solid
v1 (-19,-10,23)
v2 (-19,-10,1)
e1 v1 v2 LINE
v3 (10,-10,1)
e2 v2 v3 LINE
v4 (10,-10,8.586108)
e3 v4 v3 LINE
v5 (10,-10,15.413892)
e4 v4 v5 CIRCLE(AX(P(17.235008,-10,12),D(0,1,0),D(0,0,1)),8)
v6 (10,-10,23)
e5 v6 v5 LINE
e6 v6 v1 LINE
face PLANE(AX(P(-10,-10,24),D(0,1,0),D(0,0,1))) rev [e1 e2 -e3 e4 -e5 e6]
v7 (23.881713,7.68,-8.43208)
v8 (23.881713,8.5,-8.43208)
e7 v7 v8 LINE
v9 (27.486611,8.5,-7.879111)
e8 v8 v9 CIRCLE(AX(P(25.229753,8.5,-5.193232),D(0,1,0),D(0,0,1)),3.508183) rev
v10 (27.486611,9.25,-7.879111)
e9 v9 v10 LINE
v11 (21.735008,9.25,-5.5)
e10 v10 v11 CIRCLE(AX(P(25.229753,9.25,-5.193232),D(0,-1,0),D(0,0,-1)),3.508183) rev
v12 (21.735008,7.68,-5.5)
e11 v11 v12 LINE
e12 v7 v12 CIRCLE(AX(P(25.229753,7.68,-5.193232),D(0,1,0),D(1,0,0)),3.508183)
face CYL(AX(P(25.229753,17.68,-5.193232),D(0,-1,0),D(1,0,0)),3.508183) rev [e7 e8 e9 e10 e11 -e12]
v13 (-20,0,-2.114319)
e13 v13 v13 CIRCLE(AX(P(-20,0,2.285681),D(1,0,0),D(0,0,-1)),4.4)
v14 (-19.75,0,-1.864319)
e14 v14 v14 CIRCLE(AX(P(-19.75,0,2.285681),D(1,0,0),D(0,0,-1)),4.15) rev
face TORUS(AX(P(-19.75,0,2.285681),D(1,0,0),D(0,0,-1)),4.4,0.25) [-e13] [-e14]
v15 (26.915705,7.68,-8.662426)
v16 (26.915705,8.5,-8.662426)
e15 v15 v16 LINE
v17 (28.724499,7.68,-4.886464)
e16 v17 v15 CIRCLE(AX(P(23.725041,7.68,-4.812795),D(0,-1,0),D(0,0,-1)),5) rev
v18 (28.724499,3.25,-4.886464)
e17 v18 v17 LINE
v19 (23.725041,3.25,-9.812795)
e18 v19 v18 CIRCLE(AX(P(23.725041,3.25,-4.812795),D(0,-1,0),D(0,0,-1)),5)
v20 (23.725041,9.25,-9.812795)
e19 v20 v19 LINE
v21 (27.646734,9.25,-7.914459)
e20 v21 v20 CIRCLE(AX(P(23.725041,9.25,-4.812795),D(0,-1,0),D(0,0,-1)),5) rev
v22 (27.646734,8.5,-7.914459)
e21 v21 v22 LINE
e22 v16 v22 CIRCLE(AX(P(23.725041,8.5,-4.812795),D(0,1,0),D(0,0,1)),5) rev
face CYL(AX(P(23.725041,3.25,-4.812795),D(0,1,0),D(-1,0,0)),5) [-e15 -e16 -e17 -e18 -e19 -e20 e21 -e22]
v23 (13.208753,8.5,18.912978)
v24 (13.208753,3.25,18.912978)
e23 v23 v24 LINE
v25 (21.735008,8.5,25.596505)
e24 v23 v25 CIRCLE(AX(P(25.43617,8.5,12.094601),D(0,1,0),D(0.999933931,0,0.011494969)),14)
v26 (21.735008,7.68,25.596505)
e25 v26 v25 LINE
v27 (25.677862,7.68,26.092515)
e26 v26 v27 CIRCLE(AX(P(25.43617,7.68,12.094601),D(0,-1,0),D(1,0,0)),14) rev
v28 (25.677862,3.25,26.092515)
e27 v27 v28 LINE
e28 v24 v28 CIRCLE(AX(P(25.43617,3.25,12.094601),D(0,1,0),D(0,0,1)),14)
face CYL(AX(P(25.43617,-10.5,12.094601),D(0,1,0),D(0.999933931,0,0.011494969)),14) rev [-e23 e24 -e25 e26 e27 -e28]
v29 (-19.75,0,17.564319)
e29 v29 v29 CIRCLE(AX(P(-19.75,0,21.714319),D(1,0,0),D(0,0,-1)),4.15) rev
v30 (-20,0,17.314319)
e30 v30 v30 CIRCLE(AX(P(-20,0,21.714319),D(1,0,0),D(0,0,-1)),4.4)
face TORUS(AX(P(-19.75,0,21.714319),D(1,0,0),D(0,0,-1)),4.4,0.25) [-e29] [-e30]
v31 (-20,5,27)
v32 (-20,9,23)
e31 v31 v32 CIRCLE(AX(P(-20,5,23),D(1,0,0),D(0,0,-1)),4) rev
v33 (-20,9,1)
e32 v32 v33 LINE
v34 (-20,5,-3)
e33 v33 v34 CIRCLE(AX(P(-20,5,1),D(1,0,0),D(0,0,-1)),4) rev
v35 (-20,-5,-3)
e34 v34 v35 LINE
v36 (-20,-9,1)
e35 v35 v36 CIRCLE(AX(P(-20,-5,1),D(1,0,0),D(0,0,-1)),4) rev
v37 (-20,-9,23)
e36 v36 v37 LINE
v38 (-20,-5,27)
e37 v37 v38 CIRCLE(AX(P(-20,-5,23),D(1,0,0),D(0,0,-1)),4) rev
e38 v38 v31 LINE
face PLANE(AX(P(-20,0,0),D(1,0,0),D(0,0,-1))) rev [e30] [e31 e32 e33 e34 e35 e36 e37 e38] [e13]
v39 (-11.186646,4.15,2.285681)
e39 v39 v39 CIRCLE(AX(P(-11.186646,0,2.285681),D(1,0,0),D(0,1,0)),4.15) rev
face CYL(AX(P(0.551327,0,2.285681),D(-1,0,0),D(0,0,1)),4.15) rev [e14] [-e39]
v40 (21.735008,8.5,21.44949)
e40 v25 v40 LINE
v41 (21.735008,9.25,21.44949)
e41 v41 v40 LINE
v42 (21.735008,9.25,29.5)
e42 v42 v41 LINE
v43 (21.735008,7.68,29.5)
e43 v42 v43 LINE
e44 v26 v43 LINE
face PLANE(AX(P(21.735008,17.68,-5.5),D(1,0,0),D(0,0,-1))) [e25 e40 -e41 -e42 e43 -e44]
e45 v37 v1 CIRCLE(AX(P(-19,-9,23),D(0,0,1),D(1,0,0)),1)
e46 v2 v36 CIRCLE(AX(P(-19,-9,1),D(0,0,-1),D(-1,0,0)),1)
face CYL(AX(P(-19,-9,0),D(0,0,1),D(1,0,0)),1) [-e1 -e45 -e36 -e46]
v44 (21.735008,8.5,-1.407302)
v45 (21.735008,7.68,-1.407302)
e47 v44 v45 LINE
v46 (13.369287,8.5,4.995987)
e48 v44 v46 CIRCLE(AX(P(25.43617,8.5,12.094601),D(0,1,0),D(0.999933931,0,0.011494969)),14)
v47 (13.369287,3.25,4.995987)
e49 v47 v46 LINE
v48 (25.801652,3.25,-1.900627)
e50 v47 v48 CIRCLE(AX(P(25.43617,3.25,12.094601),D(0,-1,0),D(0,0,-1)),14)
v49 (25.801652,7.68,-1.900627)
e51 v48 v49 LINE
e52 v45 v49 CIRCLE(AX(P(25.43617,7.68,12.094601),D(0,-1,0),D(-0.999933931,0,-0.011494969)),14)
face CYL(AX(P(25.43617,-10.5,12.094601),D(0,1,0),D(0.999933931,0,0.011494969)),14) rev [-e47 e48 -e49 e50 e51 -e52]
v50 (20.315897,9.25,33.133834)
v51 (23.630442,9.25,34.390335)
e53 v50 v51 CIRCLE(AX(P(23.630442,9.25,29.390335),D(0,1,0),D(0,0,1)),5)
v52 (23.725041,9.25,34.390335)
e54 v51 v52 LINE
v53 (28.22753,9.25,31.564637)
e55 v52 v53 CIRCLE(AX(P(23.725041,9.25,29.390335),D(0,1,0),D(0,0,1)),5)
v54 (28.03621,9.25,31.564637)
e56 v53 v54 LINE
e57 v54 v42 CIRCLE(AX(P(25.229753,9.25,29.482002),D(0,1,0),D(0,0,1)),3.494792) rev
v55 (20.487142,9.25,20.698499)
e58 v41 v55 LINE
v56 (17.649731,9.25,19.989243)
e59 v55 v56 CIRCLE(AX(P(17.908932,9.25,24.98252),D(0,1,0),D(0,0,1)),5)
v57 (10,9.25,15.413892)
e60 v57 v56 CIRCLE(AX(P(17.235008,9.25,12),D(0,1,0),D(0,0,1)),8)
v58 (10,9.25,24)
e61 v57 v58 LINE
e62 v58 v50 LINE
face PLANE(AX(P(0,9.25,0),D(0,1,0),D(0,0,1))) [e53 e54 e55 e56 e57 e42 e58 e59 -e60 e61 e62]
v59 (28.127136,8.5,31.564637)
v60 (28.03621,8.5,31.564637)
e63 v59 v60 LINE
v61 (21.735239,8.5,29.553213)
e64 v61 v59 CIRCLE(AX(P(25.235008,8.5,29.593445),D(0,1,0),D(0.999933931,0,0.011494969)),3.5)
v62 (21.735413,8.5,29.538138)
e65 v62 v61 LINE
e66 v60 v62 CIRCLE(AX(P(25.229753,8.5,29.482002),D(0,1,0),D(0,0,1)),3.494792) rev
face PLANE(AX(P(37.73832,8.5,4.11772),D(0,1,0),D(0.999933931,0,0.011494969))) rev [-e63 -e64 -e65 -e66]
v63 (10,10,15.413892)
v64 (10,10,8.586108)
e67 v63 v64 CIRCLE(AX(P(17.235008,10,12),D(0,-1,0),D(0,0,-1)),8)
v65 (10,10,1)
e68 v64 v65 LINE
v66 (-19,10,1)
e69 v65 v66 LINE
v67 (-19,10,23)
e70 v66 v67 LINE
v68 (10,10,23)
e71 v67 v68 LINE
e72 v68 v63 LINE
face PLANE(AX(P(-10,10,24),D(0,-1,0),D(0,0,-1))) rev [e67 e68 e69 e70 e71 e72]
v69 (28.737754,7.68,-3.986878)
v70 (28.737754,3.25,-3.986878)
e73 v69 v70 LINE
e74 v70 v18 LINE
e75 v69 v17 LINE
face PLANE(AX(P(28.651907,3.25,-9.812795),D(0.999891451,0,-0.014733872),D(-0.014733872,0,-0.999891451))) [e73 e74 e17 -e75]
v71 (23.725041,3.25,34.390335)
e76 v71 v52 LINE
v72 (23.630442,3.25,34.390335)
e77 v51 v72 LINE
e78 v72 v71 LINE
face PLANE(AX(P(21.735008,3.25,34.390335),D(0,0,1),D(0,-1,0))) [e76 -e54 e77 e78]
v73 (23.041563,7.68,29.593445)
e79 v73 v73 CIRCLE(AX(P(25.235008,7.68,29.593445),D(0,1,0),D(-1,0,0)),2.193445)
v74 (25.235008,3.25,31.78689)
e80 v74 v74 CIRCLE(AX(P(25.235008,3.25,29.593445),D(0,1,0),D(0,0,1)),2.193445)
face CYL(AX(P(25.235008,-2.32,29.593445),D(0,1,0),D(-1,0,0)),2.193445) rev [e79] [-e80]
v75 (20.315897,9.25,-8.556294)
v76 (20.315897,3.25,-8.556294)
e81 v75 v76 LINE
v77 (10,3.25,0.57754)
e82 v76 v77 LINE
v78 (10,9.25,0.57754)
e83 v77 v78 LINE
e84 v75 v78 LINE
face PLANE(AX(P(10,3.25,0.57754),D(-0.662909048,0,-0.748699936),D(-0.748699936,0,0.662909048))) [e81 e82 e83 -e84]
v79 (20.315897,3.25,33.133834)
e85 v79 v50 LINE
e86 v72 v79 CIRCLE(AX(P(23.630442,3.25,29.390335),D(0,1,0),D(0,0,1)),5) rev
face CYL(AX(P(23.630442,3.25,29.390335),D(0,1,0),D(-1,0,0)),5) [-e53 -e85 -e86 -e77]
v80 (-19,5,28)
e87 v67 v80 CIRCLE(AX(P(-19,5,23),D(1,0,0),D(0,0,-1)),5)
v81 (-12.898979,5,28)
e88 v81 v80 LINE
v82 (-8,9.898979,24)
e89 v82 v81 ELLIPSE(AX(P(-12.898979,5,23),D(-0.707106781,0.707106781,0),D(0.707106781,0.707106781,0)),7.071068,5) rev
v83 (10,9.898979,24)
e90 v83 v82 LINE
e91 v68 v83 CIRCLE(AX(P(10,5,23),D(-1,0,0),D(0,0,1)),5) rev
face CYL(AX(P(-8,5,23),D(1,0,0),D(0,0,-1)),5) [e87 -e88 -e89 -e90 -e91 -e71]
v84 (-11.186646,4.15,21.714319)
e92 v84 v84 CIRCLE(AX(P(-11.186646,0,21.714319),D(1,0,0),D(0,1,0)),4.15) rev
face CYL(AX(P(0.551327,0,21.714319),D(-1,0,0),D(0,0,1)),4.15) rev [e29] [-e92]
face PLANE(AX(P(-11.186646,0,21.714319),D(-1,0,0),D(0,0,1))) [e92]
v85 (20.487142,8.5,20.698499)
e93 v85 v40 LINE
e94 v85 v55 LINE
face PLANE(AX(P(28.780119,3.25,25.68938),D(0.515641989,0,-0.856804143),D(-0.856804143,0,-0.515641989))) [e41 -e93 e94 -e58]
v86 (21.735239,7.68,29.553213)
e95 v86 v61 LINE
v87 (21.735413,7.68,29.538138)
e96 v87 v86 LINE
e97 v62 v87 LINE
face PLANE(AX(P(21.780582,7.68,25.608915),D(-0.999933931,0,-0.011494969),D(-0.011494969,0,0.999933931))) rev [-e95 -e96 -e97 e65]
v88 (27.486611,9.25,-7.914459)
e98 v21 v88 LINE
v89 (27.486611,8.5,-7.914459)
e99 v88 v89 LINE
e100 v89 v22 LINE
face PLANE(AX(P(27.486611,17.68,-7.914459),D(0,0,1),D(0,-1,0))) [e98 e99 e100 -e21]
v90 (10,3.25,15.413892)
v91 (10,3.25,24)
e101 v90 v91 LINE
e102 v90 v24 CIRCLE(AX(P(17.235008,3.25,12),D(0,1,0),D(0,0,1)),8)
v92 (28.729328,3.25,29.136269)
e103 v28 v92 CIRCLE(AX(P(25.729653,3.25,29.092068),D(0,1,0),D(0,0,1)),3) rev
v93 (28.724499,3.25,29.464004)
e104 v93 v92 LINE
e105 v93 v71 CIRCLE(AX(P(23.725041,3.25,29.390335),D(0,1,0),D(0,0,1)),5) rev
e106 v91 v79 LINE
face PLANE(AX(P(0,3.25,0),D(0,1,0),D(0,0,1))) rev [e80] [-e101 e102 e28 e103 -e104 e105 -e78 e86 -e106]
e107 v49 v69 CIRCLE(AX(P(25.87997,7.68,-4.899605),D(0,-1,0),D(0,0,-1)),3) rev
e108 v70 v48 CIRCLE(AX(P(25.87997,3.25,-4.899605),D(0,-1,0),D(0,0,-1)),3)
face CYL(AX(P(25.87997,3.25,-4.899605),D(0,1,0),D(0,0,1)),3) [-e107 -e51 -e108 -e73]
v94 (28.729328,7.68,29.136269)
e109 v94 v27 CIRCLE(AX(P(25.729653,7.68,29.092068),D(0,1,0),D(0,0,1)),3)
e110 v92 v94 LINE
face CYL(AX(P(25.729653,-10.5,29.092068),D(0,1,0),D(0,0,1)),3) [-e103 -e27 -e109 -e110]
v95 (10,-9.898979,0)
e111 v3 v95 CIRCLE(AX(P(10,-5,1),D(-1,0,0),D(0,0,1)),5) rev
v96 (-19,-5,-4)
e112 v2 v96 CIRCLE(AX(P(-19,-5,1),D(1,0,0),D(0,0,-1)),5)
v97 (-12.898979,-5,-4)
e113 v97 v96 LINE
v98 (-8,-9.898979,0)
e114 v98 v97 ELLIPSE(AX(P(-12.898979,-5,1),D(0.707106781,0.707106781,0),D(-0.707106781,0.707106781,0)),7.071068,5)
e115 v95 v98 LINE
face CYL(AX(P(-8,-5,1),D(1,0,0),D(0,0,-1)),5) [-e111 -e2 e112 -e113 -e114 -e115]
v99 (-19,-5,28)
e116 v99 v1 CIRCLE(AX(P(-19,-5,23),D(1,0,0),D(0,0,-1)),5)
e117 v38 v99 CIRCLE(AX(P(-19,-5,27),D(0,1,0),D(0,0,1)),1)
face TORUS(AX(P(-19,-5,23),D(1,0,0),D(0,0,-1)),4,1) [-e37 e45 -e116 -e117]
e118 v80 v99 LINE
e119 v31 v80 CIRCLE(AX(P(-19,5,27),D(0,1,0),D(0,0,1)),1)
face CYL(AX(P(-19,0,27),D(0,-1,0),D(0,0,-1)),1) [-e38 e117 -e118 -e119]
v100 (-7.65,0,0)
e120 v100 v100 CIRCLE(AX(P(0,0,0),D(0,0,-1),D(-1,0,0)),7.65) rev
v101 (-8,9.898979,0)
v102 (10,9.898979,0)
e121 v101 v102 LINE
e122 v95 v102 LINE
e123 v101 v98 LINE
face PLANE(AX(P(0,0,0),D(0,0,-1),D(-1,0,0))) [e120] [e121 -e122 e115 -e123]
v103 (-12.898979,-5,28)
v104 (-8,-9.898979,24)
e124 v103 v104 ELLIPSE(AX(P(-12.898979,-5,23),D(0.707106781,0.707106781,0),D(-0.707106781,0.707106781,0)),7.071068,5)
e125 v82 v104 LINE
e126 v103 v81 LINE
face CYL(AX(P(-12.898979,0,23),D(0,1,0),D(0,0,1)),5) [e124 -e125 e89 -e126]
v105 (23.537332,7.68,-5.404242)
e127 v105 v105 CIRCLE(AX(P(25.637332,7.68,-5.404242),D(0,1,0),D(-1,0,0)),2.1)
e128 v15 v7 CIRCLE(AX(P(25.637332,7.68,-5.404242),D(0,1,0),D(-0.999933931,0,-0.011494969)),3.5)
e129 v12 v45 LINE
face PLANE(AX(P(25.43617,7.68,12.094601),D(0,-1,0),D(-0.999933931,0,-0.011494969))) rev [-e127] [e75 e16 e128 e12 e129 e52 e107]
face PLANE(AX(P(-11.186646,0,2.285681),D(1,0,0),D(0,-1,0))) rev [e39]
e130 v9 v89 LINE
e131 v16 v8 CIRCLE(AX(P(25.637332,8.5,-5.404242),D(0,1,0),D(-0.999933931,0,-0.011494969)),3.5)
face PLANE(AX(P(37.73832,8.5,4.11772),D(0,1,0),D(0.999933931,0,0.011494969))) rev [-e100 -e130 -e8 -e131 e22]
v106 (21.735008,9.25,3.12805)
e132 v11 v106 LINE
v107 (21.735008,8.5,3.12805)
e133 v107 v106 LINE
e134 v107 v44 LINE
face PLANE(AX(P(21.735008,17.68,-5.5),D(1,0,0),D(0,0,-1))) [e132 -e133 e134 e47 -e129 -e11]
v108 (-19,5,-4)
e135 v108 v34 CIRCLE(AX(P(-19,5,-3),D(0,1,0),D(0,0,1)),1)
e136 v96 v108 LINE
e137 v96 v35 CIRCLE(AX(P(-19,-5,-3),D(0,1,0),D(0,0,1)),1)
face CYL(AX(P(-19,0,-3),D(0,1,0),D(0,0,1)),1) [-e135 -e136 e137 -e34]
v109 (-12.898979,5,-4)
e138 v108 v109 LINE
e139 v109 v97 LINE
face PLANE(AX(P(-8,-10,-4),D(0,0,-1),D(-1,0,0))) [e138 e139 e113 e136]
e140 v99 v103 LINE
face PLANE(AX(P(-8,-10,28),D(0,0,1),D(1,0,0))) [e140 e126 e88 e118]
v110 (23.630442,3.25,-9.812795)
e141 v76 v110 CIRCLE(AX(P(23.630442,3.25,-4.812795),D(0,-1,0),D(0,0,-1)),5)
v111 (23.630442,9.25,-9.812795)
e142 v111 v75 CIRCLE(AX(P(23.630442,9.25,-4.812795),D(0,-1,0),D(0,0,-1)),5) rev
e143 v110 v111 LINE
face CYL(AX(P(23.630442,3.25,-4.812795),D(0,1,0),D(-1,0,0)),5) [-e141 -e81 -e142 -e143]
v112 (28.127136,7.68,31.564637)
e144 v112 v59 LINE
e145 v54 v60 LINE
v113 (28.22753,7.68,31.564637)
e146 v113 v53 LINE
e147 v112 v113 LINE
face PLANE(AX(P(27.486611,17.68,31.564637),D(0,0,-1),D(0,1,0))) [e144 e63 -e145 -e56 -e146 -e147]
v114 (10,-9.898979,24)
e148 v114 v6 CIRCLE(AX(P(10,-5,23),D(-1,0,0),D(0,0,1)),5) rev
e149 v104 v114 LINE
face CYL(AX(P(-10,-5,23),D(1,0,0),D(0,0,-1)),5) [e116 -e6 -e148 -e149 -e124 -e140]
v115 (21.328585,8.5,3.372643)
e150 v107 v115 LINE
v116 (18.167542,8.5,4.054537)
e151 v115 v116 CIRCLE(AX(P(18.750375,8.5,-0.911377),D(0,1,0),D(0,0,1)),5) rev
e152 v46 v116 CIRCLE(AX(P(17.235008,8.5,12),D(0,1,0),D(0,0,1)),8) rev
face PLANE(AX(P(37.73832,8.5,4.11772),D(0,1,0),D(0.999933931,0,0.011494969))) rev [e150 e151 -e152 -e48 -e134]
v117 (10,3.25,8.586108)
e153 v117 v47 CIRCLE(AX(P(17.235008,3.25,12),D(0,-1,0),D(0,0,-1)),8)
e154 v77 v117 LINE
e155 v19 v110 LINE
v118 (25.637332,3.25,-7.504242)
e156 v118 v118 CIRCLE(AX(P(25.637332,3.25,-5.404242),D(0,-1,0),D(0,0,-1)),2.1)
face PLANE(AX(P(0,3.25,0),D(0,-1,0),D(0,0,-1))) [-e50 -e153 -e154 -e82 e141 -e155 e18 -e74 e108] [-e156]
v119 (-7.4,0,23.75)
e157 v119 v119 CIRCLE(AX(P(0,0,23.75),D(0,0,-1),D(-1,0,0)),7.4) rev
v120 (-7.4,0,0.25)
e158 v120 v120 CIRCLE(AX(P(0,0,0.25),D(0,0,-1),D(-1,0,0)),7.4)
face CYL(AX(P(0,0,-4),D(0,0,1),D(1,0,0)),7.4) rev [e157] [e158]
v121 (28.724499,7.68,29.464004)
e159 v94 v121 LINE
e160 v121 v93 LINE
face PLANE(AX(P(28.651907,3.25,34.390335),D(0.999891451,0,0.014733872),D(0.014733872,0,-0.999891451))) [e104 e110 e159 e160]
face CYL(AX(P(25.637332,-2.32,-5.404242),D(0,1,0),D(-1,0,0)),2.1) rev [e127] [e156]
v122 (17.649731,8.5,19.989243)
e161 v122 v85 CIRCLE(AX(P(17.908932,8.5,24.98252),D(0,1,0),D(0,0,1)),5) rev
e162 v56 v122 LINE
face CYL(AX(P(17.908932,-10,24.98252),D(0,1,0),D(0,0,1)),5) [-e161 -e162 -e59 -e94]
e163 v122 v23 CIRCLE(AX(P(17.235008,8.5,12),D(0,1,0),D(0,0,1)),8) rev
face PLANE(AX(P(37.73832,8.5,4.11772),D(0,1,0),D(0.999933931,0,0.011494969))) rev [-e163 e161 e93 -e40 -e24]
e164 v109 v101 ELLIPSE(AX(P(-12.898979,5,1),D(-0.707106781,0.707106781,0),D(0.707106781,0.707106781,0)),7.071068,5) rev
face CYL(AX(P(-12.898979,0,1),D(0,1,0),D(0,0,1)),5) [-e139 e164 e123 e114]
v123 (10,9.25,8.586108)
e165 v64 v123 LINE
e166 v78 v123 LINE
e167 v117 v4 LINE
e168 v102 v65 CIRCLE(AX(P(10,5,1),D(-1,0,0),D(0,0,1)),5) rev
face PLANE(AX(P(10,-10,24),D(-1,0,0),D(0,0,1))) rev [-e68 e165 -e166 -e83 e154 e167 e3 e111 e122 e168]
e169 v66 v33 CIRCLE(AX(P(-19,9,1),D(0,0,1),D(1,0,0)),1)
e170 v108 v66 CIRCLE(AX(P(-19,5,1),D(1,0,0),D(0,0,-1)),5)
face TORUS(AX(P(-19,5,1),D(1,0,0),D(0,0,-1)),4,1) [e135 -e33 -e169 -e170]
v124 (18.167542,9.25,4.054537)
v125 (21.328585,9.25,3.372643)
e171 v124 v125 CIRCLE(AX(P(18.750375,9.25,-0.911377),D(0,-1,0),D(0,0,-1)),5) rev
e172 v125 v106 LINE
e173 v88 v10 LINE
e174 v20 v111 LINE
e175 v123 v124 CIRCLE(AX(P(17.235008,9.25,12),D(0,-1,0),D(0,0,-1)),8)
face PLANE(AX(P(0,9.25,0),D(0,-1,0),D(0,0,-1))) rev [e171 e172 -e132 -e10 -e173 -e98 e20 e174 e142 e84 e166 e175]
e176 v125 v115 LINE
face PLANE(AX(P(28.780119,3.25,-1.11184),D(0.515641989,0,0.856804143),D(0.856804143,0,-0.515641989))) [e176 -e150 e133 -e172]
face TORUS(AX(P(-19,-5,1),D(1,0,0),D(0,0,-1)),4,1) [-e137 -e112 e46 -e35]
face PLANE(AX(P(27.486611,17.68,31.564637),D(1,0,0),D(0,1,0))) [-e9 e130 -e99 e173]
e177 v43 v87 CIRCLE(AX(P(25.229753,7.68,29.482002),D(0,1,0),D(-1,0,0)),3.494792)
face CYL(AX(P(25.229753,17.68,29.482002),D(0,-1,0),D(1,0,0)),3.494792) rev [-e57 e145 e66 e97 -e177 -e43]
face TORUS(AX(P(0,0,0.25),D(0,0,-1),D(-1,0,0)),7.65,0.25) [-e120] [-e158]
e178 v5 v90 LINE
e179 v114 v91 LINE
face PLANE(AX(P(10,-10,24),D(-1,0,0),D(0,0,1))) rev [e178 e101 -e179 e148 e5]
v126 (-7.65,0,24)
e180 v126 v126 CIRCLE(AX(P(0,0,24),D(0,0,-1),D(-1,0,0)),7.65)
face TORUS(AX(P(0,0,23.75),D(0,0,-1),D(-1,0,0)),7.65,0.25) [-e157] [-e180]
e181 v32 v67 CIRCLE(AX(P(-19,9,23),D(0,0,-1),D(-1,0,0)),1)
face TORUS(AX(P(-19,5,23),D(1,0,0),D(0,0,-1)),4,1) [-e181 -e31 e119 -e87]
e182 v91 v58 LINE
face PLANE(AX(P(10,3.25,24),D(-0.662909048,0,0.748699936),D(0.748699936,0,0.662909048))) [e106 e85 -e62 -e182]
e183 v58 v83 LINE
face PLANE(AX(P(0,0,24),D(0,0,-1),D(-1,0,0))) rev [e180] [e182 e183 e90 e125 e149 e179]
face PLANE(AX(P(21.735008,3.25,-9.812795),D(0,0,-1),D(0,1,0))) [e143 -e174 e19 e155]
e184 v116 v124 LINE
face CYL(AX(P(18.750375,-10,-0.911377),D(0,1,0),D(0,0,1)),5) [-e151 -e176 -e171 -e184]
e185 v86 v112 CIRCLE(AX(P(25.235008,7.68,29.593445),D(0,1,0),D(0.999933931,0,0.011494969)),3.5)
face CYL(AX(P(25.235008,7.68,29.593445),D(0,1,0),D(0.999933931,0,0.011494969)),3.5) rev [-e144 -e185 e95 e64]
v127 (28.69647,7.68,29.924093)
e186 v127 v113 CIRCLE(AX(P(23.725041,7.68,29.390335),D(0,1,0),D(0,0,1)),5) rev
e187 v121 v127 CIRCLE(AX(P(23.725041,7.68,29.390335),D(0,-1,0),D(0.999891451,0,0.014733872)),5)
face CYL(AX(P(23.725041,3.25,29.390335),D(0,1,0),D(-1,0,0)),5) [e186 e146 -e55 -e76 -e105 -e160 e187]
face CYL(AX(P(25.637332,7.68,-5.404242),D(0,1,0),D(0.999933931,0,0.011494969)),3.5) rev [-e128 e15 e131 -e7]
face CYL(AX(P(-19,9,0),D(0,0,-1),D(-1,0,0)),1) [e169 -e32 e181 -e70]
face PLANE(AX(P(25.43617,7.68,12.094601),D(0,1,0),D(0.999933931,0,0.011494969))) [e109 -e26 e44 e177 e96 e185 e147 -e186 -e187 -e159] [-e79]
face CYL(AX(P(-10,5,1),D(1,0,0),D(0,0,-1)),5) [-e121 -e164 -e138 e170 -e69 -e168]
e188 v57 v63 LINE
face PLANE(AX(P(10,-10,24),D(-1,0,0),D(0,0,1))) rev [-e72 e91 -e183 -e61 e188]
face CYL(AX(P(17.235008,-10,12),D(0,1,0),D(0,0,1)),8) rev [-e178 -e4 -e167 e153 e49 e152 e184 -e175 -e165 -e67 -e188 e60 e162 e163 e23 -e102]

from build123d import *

# Parameters (mm, degrees)
ESQUISSE1_W                  = 20
ESQUISSE1_H                  = 20
BOSS_EXTRU_1_DEPTH           = 24
BOSS_EXTRU_2_DEPTH           = 10
BOSS_EXTRU_2_DEPTH_BACK      = 2
ESQUISSE2_W                  = 32
ESQUISSE2_H                  = 20
CONG_1_R                     = 5
ENL_V_MAT_EXTRU_1_DEPTH      = 36.832945734
ENL_V_MAT_EXTRU_1_DEPTH_BACK = 36.832945734
ESQUISSE3_R                  = 7.4
CONG_4_START                 = -21
CONG_4_DEPTH                 = 31
CONG_5_R                     = 1
EMPREINTE1_START             = -20
EMPREINTE1_OUTLINE_R         = 4
EMPREINTE1_DEPTH             = 8.813354444
CONG_7_R                     = 0.25
BOSS_EXTRU_3_DEPTH           = 6
ENL_V_MAT_EXTRU_2_DEPTH      = 6
ENL_V_MAT_EXTRU_2_DEPTH_BACK = 49.80115679
ESQUISSE5_R                  = 8
CONG_9_R                     = 5
EMPREINTE2_START             = 3.25
EMPREINTE2_DEPTH             = 5.25
EMPREINTE2_START_2           = 7.68
EMPREINTE2_2_OUTLINE_R       = 2.1
EMPREINTE2_2_DEPTH           = 0.82
ENL_V_MAT_EXTRU_10_DEPTH     = 10
ESQUISSE8_W                  = 1.517338975
ESQUISSE8_H                  = 36.644648297
ENL_V_MAT_EXTRU_11_DEPTH     = 10
ESQUISSE10_W                 = 1.446938529
ESQUISSE10_H                 = 39.479096678
ENL_V_MAT_EXTRU_12_DEPTH     = 10
ESQUISSE11_R                 = 2.193445126
ESQUISSE11_R_2               = 2.1
ENL_V_MAT_EXTRU_13_DEPTH     = 10
CONG_13_R                    = 3
ESQUISSE12_R                 = 4.15
ENL_V_MAT_EXTRU_14_DEPTH     = 8.813354444
CONG_15_R                    = 0.25


with BuildPart() as part:
    # Esquisse1 → Boss.-Extru.1 (new body)
    with BuildSketch(Plane.XY):
        Rectangle(ESQUISSE1_W, ESQUISSE1_H)
    extrude(amount=BOSS_EXTRU_1_DEPTH)

    # Esquisse2 → Boss.-Extru.2 (add, two sides: drawn at the far end of the back side and taken through both)
    with BuildSketch(Plane.ZY.offset(10).offset(-BOSS_EXTRU_2_DEPTH_BACK)):
        with Locations((12, 0)):
            Rectangle(ESQUISSE2_W, ESQUISSE2_H)
    extrude(amount=BOSS_EXTRU_2_DEPTH + BOSS_EXTRU_2_DEPTH_BACK)

    # Congé1
    # the kernel refuses this fillet: 5 mm, written as the material it takes off along each edge
    with BuildSketch(Plane(origin=(-8, 22.247448714, -4), x_dir=(-1, 0, 0), z_dir=(0, -1, 0))) as cong_1_piece_1:
        with BuildLine():
            CenterArc((4.898979486, -5), CONG_1_R, 90, 78.463040967)
            Line((0, -4), (-0.09797959, -3.98))
            ThreePointArc((-0.09797959, -3.98), (-0.1, -2), (-0.1, 0))
            Line((-0.1, 0), (0, 0.1))
            Line((0, 0.1), (4.898979486, 0.1))
            Line((4.898979486, 0.1), (4.898979486, 0))
        make_face()
    extrude(amount=44.494897428, mode=Mode.SUBTRACT)
    with BuildSketch(Plane(origin=(-8, -22.247448714, 28), x_dir=(-1.5565326805242233e-12, 0, -1.0), z_dir=(0, 1, 0))) as cong_1_piece_2:
        with BuildLine():
            CenterArc((5, 4.898979486), CONG_1_R, 180, 78.463040967)
            Line((0, 4.898979486), (-0.1, 4.898979486))
            Line((-0.1, 4.898979486), (-0.1, 0))
            Line((-0.1, 0), (0, -0.1))
            ThreePointArc((0, -0.1), (2, -0.1), (3.98, -0.09797959))
            Line((3.98, -0.09797959), (4, 0))
        make_face()
    extrude(amount=44.494897428, mode=Mode.SUBTRACT)

    # Esquisse3 → Enlèv. mat.-Extru.1 (cut, two sides: drawn at the far end of the back side and taken through both)
    with BuildSketch(Plane.XY.offset(24).offset(-ENL_V_MAT_EXTRU_1_DEPTH_BACK)):
        with Locations(Location((0, 0, 0), (0, 0, 180))):
            Circle(ESQUISSE3_R)
    extrude(amount=ENL_V_MAT_EXTRU_1_DEPTH + ENL_V_MAT_EXTRU_1_DEPTH_BACK, mode=Mode.SUBTRACT)

    # Congé4: read off the stored shape, not the designer's step
    # Congé4 outline → Congé4 (cut)
    with BuildSketch(Plane.YZ.offset(CONG_4_START)):
        with BuildLine():
            ThreePointArc((-5, -4), (-8.535533906, -2.535533906), (-10, 1))
            Line((-10, 1), (-10, -4))
            Line((-10, -4), (-5, -4))
        make_face()
        with BuildLine():
            Line((-10, 28), (-10, 23))
            ThreePointArc((-10, 23), (-8.535533906, 26.535533906), (-5, 28))
            Line((-5, 28), (-10, 28))
        make_face()
        with BuildLine():
            ThreePointArc((10, 1), (8.535533906, -2.535533906), (5, -4))
            Line((5, -4), (10, -4))
            Line((10, -4), (10, 1))
        make_face()
        with BuildLine():
            Line((10, 28), (5, 28))
            ThreePointArc((5, 28), (8.535533906, 26.535533906), (10, 23))
            Line((10, 23), (10, 28))
        make_face()
    extrude(amount=CONG_4_DEPTH, mode=Mode.SUBTRACT)

    # Congé5
    cong_5_edges = [part.edges().sort_by_distance(p)[0] for p in [
        (-20, 0, -4),
        (-20, 0, 28),
        (-20, 10, 12),
        (-20, -10, 12),
        (-20, 8.535533906, 26.535533906),
        (-20, -8.535533906, 26.535533906),
        (-20, 8.535533906, -2.535533906),
        (-20, -8.535533906, -2.535533906),
    ]]
    fillet(cong_5_edges, radius=CONG_5_R)

    # Empreinte1: read off the stored shape, not the designer's step
    # Empreinte1 outline → Empreinte1 (cut)
    with BuildSketch(Plane.YZ.offset(EMPREINTE1_START)):
        with Locations((0, 2.285680752)):
            Circle(EMPREINTE1_OUTLINE_R)
        with Locations((0, 21.714319248)):
            Circle(EMPREINTE1_OUTLINE_R)
    extrude(amount=EMPREINTE1_DEPTH, mode=Mode.SUBTRACT)

    # Congé7
    cong_7_edges = [part.edges().sort_by_distance(p)[0] for p in [
        (7.4, 0, 24),
        (7.4, 0, 0),
    ]]
    fillet(cong_7_edges, radius=CONG_7_R)

    # Esquisse4 → Boss.-Extru.3 (add)
    with BuildSketch(Plane(origin=(0, 9.25, 0), x_dir=(1, 0, 0), z_dir=(0, 1, 0))):
        Polygon((10, -24), (21.735008047, -34.390334815), (28.651906702, -34.390334815), (28.780119379, -25.689379844), (10, -14.387125776), align=None)
        Polygon((21.735008047, 9.812794761), (28.651906702, 9.812794761), (28.780119379, 1.11183979), (10, -10.190414278), (10, -0.577540054), align=None)
    extrude(amount=-BOSS_EXTRU_3_DEPTH)

    # Esquisse5 → Enlèv. mat.-Extru.2 (cut, two sides: drawn at the far end of the back side and taken through both)
    with BuildSketch(Plane(origin=(0, 9.25, 0), x_dir=(1, 0, 0), z_dir=(0, 1, 0)).offset(-ENL_V_MAT_EXTRU_2_DEPTH_BACK)):
        with Locations((17.235008047, -12)):
            Circle(ESQUISSE5_R)
    extrude(amount=ENL_V_MAT_EXTRU_2_DEPTH + ENL_V_MAT_EXTRU_2_DEPTH_BACK, mode=Mode.SUBTRACT)

    # Congé9
    cong_9_edges = [part.edges().sort_by_distance(p)[0] for p in [
        (28.780119379, 6.25, 25.689379844),
        (28.651906702, 6.25, 34.390334815),
        (21.735008047, 6.25, 34.390334815),
        (21.735008047, 6.25, -9.812794761),
        (28.651906702, 6.25, -9.812794761),
        (28.780119379, 6.25, -1.11183979),
        (19.660479071, 6.25, 4.376543414),
        (18.999232398, 6.25, 19.803045075),
    ]]
    fillet(cong_9_edges, radius=CONG_9_R)

    # Empreinte2: read off the stored shape, not the designer's step
    # Empreinte2 outline → Empreinte2 (cut)
    with BuildSketch(Plane(origin=(0, 0, 0), x_dir=(1, 0, 0), z_dir=(0, 1, 0)).offset(EMPREINTE2_START)):
        with BuildLine():
            ThreePointArc((17.649730777, -19.989243084), (15.35076315, -19.774935445), (13.208752532, -18.912978123))
            ThreePointArc((13.208752532, -18.912978123), (19.481469237, -24.765100097), (27.990063865, -25.859688559))
            ThreePointArc((27.990063865, -25.859688559), (27.251872882, -24.933392554), (26.316507021, -24.20672831))
            Line((26.316507021, -24.20672831), (20.487142429, -20.698499297))
            ThreePointArc((20.487142429, -20.698499297), (19.121455018, -20.131768616), (17.649730777, -19.989243084))
        make_face()
        with BuildLine():
            ThreePointArc((28.187748673, 1.632336222), (19.719755676, 0.685172024), (13.369286614, -4.995987022))
            ThreePointArc((13.369286614, -4.995987022), (15.694722516, -4.14968023), (18.167541779, -4.054537091))
            ThreePointArc((18.167541779, -4.054537091), (19.804712323, -3.976196156), (21.328585306, -3.372643487))
            Line((21.328585306, -3.372643487), (26.316507021, -0.370811744))
            ThreePointArc((26.316507021, -0.370811744), (27.39208376, 0.500022355), (28.187748673, 1.632336222))
        make_face()
    extrude(amount=EMPREINTE2_DEPTH, mode=Mode.SUBTRACT)

    # Empreinte2 2 outline → Empreinte2 2 (cut)
    # profile 1 of 2: a face of its own
    with BuildSketch(Plane(origin=(0, 0, 0), x_dir=(1, 0, 0), z_dir=(0, 1, 0)).offset(EMPREINTE2_START_2)):
        with BuildLine():
            ThreePointArc((26.915705435, 8.662426184), (23.682222766, 8.307266393), (22.137563205, 5.444474838))
            Line((22.137563205, 5.444474838), (22.092220629, 1.500177164))
            ThreePointArc((22.092220629, 1.500177164), (25.132702926, 1.902109264), (28.187748673, 1.632336222))
            ThreePointArc((28.187748673, 1.632336222), (28.607222702, 2.775859748), (28.73775433, 3.986878332))
            Line((28.73775433, 3.986878332), (28.724498509, 4.886464122))
            ThreePointArc((28.724498509, 4.886464122), (28.234364336, 6.972888592), (26.915705435, 8.662426184))
        make_face()
        with Locations((25.637331962, 5.404242447)):
            Circle(EMPREINTE2_2_OUTLINE_R, mode=Mode.SUBTRACT)
    # profile 2 of 2: a face of its own
    with BuildSketch(Plane(origin=(0, 0, 0), x_dir=(1, 0, 0), z_dir=(0, 1, 0)).offset(EMPREINTE2_START_2)):
        with BuildLine():
            ThreePointArc((27.990063865, -25.859688559), (24.871232479, -26.083198324), (21.780581865, -25.608915061))
            Line((21.780581865, -25.608915061), (21.735239289, -29.553212735))
            ThreePointArc((21.735239289, -29.553212735), (24.615179041, -33.038123922), (28.529279907, -30.77571959))
            ThreePointArc((28.529279907, -30.77571959), (28.670570821, -30.126362885), (28.724498509, -29.464004177))
            Line((28.724498509, -29.464004177), (28.73775433, -28.564418387))
            ThreePointArc((28.73775433, -28.564418387), (28.557547789, -27.158524354), (27.990063865, -25.859688559))
        make_face()
        with Locations((25.235008047, -29.593445126)):
            Circle(EMPREINTE2_2_OUTLINE_R, mode=Mode.SUBTRACT)
    extrude(amount=EMPREINTE2_2_DEPTH, mode=Mode.SUBTRACT)

    # Esquisse7 → Enlèv. mat.-Extru.10 (cut)
    with BuildSketch(Plane(origin=(0, 7.68, 0), x_dir=(1, 0, 0), z_dir=(0, 1, 0))):
        with BuildLine():
            Line((21.735008047, -25.555441712), (21.735008047, -29.5))
            ThreePointArc((21.735008047, -29.5), (25.247751189, -32.976747319), (28.724498509, -29.464004177))
            Line((28.724498509, -29.464004177), (28.724498509, 4.886464122))
            ThreePointArc((28.724498509, 4.886464122), (25.536521216, 8.687977292), (21.735008047, 5.5))
            Line((21.735008047, 5.5), (21.735008047, 1.555441712))
            Line((21.735008047, 1.555441712), (21.735008047, -25.555441712))
        make_face()
    extrude(amount=ENL_V_MAT_EXTRU_10_DEPTH, mode=Mode.SUBTRACT)


with BuildPart() as enl_v_mat_extru_10_piece_1:
    # of the separate pieces the step leaves, piece 1, a body of its own (enl_v_mat_extru_10_pieces)
    add(part.part.solids().sort_by_distance((17.649730777, 9.25, 19.989243084))[0])


with BuildPart() as enl_v_mat_extru_10_piece_2:
    # of the separate pieces the step leaves, piece 2, a body of its own (enl_v_mat_extru_10_pieces)
    add(part.part.solids().sort_by_distance((28.724498509, 9.25, 28.119541158))[0])


with BuildPart() as enl_v_mat_extru_10_piece_3:
    # of the separate pieces the step leaves, piece 3, a body of its own (enl_v_mat_extru_10_pieces)
    add(part.part.solids().sort_by_distance((28.724498509, 9.25, -3.542001104))[0])


with BuildPart() as enl_v_mat_extru_11_tool:
    # Esquisse8 → Enlèv. mat.-Extru.11 (new body)
    with BuildSketch(Plane(origin=(0, 7.68, 0), x_dir=(1, 0, 0), z_dir=(0, 1, 0))):
        with Locations((28.329525031, -12.119956541)):
            Rectangle(ESQUISSE8_W, ESQUISSE8_H)
    extrude(amount=ENL_V_MAT_EXTRU_11_DEPTH)


with BuildPart() as enl_v_mat_extru_10_piece_1_1:
    add(enl_v_mat_extru_10_piece_1.part)

    # Enlèv. mat.-Extru.11: cut by enl_v_mat_extru_11_tool
    add(enl_v_mat_extru_11_tool.part, mode=Mode.SUBTRACT)

    # Esquisse10 → Enlèv. mat.-Extru.12 (cut)
    with BuildSketch(Plane(origin=(0, 7.68, 0), x_dir=(1, 0, 0), z_dir=(0, 1, 0))):
        with Locations((28.210080316, -11.825088843)):
            Rectangle(ESQUISSE10_W, ESQUISSE10_H)
    extrude(amount=ENL_V_MAT_EXTRU_12_DEPTH, mode=Mode.SUBTRACT)

    # Esquisse11 → Enlèv. mat.-Extru.13 (cut)
    with BuildSketch(Plane(origin=(0, 7.68, 0), x_dir=(1, 0, 0), z_dir=(0, 1, 0))):
        with Locations(Location((25.235008047, -29.593445126, 0), (0, 0, 180))):
            Circle(ESQUISSE11_R)
        with Locations(Location((25.637331962, 5.404242447, 0), (0, 0, 180))):
            Circle(ESQUISSE11_R_2)
    extrude(amount=-ENL_V_MAT_EXTRU_13_DEPTH, mode=Mode.SUBTRACT)

    # Congé13
    # the kernel refuses this fillet: 3 mm, written as the material it takes off along each edge
    with BuildSketch(Plane(origin=(28.187748673, -2.794819462, -1.632336222), x_dir=(-0.9937380148101644, 0, -0.11173521343405236), z_dir=(0, 1, 0))) as cong_13_piece_1:
        with BuildLine():
            CenterArc((2.658396201, -2.988948838), CONG_13_R, 94.919425392, 73.783351826)
            ThreePointArc((-0.283476264, -2.401253002), (-0.289075444, -1.183232819), (0, 0))
            ThreePointArc((0, 0), (1.200566026, -0.051572088), (2.401132053, 0))
        make_face()
    extrude(amount=16.519638924, mode=Mode.SUBTRACT)
    with BuildSketch(Plane(origin=(27.990063865, -5.147355834, 25.859688559), x_dir=(-0.9949685219943973, 0, 0.10018802443548065), z_dir=(0, 1, 0))) as cong_13_piece_2:
        with BuildLine():
            CenterArc((2.572882872, 2.989649586), CONG_13_R, 173.405782892, 91.833407481)
            Line((-0.407270212, 3.33416025), (-0.70528552, 3.368611317))
            ThreePointArc((-0.70528552, 3.368611317), (-0.770962247, 2.800481736), (-0.269638492, -0.131510774))
            Line((-0.269638492, -0.131510774), (0.024898866, -0.298964959))
            ThreePointArc((0.024898866, -0.298964959), (1.161947103, -0.251698066), (2.29899534, -0.298964959))
            Line((2.29899534, -0.298964959), (2.323894207, 0))
        make_face()
    extrude(amount=21.224711669, mode=Mode.SUBTRACT)

    # Esquisse12 → Enlèv. mat.-Extru.14 (cut)
    with BuildSketch(Plane.ZY.offset(20)):
        with Locations((2.285680752, 0)):
            Circle(ESQUISSE12_R)
        with Locations((21.714319248, 0)):
            Circle(ESQUISSE12_R)
    extrude(amount=-ENL_V_MAT_EXTRU_14_DEPTH, mode=Mode.SUBTRACT)

    # Congé15
    cong_15_edges = [enl_v_mat_extru_10_piece_1_1.edges().sort_by_distance(p)[0] for p in [
        (-20, 0, -1.864319248),
        (-20, 0, 17.564319248),
    ]]
    fillet(cong_15_edges, radius=CONG_15_R)


with BuildPart() as enl_v_mat_extru_10_piece_2_1:
    add(enl_v_mat_extru_10_piece_2.part)

    # Enlèv. mat.-Extru.11: cut by enl_v_mat_extru_11_tool
    add(enl_v_mat_extru_11_tool.part, mode=Mode.SUBTRACT)


with BuildPart() as enl_v_mat_extru_10_piece_3_1:
    add(enl_v_mat_extru_10_piece_3.part)

    # Enlèv. mat.-Extru.11: cut by enl_v_mat_extru_11_tool
    add(enl_v_mat_extru_11_tool.part, mode=Mode.SUBTRACT)


solid = enl_v_mat_extru_10_piece_1_1.part
